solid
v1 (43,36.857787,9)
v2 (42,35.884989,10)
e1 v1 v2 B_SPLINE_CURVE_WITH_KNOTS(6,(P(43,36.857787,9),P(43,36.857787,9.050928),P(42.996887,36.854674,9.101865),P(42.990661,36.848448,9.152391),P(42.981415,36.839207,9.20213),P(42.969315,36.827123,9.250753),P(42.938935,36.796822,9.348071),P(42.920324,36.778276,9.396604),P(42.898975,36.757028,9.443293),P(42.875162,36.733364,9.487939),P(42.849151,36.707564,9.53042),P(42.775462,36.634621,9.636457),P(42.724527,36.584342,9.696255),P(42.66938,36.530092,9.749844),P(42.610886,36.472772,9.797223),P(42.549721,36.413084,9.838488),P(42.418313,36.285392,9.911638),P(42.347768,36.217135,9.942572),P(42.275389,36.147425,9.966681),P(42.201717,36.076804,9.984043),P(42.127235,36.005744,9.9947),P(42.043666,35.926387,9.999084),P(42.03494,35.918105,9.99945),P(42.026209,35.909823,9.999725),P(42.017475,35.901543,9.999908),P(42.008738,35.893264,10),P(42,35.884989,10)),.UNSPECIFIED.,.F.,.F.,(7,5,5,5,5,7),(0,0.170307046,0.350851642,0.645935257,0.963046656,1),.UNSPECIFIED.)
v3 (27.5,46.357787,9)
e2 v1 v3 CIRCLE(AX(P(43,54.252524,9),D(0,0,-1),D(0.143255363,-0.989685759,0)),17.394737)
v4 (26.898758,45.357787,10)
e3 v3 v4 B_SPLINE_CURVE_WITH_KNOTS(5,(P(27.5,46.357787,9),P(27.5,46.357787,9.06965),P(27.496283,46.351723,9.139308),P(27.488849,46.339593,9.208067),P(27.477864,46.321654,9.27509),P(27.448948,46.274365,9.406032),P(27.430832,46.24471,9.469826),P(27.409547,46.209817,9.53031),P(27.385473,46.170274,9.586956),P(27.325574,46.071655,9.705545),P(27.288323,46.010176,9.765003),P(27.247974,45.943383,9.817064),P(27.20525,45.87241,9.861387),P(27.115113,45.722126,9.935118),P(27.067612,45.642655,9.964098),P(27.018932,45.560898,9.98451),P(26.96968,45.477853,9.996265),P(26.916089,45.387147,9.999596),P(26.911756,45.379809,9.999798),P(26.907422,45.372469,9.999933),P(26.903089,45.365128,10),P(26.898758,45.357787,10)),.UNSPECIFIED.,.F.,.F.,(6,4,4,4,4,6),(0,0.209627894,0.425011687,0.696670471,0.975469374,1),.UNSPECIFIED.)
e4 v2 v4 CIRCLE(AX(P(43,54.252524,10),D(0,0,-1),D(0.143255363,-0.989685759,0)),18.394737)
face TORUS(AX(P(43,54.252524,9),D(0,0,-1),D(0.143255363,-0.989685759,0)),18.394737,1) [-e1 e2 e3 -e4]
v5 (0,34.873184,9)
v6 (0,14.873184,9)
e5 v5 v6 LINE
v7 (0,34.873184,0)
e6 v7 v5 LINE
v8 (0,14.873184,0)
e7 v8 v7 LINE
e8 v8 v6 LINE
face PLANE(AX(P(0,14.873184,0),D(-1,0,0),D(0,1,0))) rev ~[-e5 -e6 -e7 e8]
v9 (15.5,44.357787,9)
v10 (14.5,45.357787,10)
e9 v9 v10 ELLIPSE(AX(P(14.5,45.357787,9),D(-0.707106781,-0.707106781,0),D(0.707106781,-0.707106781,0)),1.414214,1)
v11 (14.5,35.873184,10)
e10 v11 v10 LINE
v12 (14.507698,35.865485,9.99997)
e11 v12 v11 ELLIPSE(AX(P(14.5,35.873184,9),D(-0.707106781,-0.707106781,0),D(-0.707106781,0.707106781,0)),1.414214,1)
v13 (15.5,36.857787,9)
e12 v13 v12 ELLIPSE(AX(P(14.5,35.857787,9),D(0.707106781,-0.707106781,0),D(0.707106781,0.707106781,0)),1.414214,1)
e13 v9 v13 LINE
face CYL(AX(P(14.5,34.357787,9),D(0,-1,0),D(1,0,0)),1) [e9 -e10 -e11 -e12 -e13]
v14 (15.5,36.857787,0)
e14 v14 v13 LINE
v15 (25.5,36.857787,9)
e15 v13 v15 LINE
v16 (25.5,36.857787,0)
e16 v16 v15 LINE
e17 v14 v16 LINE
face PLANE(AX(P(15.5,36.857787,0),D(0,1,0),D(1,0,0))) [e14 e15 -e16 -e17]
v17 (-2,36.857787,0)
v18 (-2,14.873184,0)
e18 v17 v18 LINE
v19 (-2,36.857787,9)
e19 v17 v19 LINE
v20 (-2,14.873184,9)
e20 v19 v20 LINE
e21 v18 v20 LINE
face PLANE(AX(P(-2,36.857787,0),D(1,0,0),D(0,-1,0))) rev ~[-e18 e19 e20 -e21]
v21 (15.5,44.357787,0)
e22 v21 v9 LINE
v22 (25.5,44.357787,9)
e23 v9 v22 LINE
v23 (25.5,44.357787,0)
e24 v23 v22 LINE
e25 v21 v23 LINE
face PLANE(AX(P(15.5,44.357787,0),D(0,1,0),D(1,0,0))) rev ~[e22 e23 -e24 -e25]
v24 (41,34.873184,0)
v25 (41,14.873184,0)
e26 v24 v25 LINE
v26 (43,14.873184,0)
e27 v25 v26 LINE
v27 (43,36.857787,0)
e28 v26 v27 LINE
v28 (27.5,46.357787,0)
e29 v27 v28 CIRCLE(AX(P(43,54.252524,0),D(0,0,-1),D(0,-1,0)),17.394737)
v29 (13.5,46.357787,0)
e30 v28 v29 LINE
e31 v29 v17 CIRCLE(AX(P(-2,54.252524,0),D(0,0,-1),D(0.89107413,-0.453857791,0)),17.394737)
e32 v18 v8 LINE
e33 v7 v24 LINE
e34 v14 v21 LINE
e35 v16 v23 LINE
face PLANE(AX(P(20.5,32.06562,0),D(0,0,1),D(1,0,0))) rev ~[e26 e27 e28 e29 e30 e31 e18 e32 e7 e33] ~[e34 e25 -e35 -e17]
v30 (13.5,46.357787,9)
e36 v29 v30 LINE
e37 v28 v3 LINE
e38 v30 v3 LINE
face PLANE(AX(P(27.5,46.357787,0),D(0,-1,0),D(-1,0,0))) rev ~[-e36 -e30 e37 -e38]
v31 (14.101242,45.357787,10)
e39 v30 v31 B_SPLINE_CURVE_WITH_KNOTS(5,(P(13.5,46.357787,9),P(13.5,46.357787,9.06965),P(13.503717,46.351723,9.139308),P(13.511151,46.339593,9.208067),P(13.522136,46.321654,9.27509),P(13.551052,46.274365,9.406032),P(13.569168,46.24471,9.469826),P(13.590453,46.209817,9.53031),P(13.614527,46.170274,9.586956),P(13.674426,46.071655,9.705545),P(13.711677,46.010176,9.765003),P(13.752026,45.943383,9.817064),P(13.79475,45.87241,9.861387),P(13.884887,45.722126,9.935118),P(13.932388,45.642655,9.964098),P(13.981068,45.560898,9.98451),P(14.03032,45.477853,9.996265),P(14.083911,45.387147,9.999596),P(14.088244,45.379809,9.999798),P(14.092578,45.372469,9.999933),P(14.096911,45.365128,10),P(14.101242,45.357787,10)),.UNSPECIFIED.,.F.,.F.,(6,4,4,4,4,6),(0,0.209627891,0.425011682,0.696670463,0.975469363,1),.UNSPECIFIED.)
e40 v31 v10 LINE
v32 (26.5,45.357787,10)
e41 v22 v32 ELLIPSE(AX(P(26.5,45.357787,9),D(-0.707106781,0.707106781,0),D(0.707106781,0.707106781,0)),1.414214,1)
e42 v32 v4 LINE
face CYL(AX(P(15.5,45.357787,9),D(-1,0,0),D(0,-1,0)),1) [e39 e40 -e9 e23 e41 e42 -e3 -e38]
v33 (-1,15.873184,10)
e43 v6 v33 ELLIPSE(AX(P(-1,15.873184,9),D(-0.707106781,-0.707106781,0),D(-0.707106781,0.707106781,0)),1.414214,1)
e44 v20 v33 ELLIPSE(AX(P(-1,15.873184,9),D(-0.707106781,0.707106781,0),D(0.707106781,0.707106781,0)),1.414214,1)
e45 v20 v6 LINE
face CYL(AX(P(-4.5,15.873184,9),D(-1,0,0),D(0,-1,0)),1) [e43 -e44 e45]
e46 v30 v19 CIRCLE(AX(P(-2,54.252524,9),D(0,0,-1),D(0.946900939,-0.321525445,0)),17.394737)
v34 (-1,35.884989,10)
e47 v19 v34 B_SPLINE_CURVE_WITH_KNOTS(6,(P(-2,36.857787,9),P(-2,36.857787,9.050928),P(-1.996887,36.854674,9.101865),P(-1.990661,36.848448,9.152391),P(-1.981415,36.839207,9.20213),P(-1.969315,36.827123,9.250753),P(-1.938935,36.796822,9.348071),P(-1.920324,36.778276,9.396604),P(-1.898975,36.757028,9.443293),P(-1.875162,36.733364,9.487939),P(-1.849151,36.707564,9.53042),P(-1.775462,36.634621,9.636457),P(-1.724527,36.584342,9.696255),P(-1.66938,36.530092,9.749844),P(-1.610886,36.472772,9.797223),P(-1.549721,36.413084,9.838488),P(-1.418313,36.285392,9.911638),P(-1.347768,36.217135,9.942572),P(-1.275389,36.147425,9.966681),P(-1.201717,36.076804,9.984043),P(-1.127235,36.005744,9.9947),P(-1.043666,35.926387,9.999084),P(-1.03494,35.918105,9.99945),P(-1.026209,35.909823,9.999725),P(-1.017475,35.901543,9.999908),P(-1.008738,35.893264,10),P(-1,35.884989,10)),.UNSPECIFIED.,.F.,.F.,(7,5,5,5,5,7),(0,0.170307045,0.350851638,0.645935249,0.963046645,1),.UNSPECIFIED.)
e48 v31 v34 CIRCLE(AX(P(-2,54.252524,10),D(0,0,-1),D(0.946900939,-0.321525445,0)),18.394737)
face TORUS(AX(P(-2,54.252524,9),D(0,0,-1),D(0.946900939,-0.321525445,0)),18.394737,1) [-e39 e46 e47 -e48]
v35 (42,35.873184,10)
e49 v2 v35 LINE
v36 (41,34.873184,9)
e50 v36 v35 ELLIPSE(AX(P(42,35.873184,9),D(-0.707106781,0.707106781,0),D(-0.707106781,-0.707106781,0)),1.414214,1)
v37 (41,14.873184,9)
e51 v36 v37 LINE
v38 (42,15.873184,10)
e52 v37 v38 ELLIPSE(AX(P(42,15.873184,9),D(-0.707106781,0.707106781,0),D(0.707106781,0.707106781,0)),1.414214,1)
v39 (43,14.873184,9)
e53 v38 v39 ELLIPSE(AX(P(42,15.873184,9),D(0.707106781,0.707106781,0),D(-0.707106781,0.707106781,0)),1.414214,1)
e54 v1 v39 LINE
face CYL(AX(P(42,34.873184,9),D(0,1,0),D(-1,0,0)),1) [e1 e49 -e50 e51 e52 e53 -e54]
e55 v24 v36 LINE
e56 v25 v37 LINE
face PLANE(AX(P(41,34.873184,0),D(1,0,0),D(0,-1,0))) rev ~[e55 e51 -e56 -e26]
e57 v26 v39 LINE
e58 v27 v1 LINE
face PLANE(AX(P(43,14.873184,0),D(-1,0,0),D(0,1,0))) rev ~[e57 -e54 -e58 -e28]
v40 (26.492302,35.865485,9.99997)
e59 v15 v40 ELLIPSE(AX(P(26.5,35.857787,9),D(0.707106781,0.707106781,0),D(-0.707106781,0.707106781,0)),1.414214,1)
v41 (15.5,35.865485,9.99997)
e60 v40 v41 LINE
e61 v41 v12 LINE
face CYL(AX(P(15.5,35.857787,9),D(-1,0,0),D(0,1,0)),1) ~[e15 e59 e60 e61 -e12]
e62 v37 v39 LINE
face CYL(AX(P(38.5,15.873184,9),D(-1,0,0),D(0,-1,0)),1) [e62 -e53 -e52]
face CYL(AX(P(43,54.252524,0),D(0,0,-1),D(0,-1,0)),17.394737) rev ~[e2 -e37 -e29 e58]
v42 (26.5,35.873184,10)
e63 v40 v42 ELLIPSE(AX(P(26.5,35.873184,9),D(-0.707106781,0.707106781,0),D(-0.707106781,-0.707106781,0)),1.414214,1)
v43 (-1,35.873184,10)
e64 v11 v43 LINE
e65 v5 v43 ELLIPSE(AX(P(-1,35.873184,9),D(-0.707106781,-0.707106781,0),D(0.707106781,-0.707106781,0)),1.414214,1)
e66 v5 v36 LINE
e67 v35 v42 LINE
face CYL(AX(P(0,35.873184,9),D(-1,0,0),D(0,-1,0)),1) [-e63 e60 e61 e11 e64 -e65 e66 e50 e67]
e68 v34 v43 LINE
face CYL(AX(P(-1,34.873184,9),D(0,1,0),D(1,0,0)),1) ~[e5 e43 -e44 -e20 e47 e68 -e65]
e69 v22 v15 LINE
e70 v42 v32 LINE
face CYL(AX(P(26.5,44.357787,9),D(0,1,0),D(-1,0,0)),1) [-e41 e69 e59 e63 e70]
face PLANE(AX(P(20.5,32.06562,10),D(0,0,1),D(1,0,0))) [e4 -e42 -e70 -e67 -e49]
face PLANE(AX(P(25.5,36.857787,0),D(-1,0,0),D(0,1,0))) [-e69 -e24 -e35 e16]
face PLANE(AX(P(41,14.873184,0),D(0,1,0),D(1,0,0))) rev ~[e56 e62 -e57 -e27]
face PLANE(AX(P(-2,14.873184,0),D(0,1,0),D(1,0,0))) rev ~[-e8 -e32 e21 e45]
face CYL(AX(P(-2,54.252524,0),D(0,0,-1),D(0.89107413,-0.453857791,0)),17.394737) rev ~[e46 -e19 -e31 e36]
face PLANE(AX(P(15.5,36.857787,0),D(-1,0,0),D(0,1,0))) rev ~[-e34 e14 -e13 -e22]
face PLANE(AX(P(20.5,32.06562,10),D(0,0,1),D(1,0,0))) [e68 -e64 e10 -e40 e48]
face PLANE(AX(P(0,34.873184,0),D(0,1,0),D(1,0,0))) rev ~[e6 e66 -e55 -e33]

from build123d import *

# Parameters (mm, degrees)
F0_W         = 10
F0_H         = 7.5
F1_DEPTH     = 10
F2_T1_DEPTH  = 26.9846032165
F2_T3_DEPTH  = 7
F2_T5_DEPTH  = 22.5
F2_T7_DEPTH  = 41
F2_T9_DEPTH  = 7
F2_T11_DEPTH = 19
F2_T13_DEPTH = 7.5
F2_T15_DEPTH = 10
F2_T18_ANGLE = 79.4810617097
F2_T20_ANGLE = 79.4810617097
F2_T25_DEPTH = 25
F2_T29_DEPTH = 43.5
F2_T36_DEPTH = 43.5
F2_T40_DEPTH = 25
F2_T47_DEPTH = 10
F2_T51_DEPTH = 12.5
F2_T58_DEPTH = 10
F2_T62_DEPTH = 12.5
F2_T69_DEPTH = 12.5
F2_T73_DEPTH = 10
F2_T80_DEPTH = 10
F2_T84_DEPTH = 12.5


# Not quite as in the source:
# - a fillet or chamfer that OpenCascade refuses, or shapes differently, is made with other operations: its cross-section is extruded or revolved along the edge and cut away or added


with BuildPart() as f1:
    # F0 (on Top) → F1 (new body)
    with BuildSketch(Plane.XY):
        with BuildLine():
            Line((0, 34.8731837149), (41, 34.8731837149))
            Line((41, 34.8731837149), (41, 14.8731837149))
            Line((41, 14.8731837149), (43, 14.8731837149))
            Line((43, 14.8731837149), (43, 36.8577869315))
            ThreePointArc((43, 36.8577869315), (33.9101705187, 39.4217493566), (27.5, 46.3577869315))
            Line((27.5, 46.3577869315), (13.5, 46.3577869315))
            ThreePointArc((13.5, 46.3577869315), (7.0898294813, 39.4217493566), (-2, 36.8577869315))
            Line((-2, 36.8577869315), (-2, 14.8731837149))
            Line((-2, 14.8731837149), (0, 14.8731837149))
            Line((0, 14.8731837149), (0, 34.8731837149))
        make_face()
        with Locations((20.5, 40.6077869315)):
            Rectangle(F0_W, F0_H, mode=Mode.SUBTRACT)
    extrude(amount=F1_DEPTH)

    # F2: fillet of radius 1 on 14 edges, made by hand

    # F2_s2 → F2_t1 (cut)
    with BuildSketch(Plane.XZ.offset(-39.3577869315)):
        with BuildLine():
            ThreePointArc((-2, 9), (-1.7071067812, 9.7071067812), (-1, 10))
            Line((-1, 10), (-2, 10))
            Line((-2, 10), (-2, 9))
        make_face()
        with BuildLine():
            ThreePointArc((43, 9), (42.7071067812, 9.7071067812), (42, 10))
            Line((42, 10), (43, 10))
            Line((43, 10), (43, 9))
        make_face()
    extrude(amount=F2_T1_DEPTH, mode=Mode.SUBTRACT)

    # F2_s4 → F2_t3 (cut)
    with BuildSketch(Plane.YZ.offset(-4.5)):
        with BuildLine():
            ThreePointArc((14.8731837149, 9), (15.1660769337, 9.7071067812), (15.8731837149, 10))
            Line((15.8731837149, 10), (14.8731837149, 10))
            Line((14.8731837149, 10), (14.8731837149, 9))
        make_face()
    extrude(amount=F2_T3_DEPTH, mode=Mode.SUBTRACT)

    # F2_s6 → F2_t5 (cut)
    with BuildSketch(Plane.XZ.offset(-34.8731837149)):
        with BuildLine():
            ThreePointArc((0, 9), (-0.2928932188, 9.7071067812), (-1, 10))
            Line((-1, 10), (0, 10))
            Line((0, 10), (0, 9))
        make_face()
        with BuildLine():
            ThreePointArc((41, 9), (41.2928932188, 9.7071067812), (42, 10))
            Line((42, 10), (41, 10))
            Line((41, 10), (41, 9))
        make_face()
    extrude(amount=F2_T5_DEPTH, mode=Mode.SUBTRACT)

    # F2_s8 → F2_t7 (cut)
    with BuildSketch(Plane.YZ):
        with BuildLine():
            ThreePointArc((34.8731837149, 9), (35.1660769337, 9.7071067812), (35.8731837149, 10))
            Line((35.8731837149, 10), (34.8731837149, 10))
            Line((34.8731837149, 10), (34.8731837149, 9))
        make_face()
    extrude(amount=F2_T7_DEPTH, mode=Mode.SUBTRACT)

    # F2_s10 → F2_t9 (cut)
    with BuildSketch(Plane.YZ.offset(38.5)):
        with BuildLine():
            ThreePointArc((14.8731837149, 9), (15.1660769337, 9.7071067812), (15.8731837149, 10))
            Line((15.8731837149, 10), (14.8731837149, 10))
            Line((14.8731837149, 10), (14.8731837149, 9))
        make_face()
    extrude(amount=F2_T9_DEPTH, mode=Mode.SUBTRACT)

    # F2_s12 → F2_t11 (cut)
    with BuildSketch(Plane.YZ.offset(11)):
        with BuildLine():
            ThreePointArc((46.3577869315, 9), (46.0648937127, 9.7071067812), (45.3577869315, 10))
            Line((45.3577869315, 10), (46.3577869315, 10))
            Line((46.3577869315, 10), (46.3577869315, 9))
        make_face()
    extrude(amount=F2_T11_DEPTH, mode=Mode.SUBTRACT)

    # F2_s14 → F2_t13 (cut)
    with BuildSketch(Plane.XZ.offset(-44.3577869315)):
        with BuildLine():
            ThreePointArc((25.5, 9), (25.7928932188, 9.7071067812), (26.5, 10))
            Line((26.5, 10), (25.5, 10))
            Line((25.5, 10), (25.5, 9))
        make_face()
        with BuildLine():
            ThreePointArc((15.5, 9), (15.2071067812, 9.7071067812), (14.5, 10))
            Line((14.5, 10), (15.5, 10))
            Line((15.5, 10), (15.5, 9))
        make_face()
    extrude(amount=F2_T13_DEPTH, mode=Mode.SUBTRACT)

    # F2_s16 → F2_t15 (cut)
    with BuildSketch(Plane.YZ.offset(15.5)):
        with BuildLine():
            ThreePointArc((36.8577869315, 9), (36.5648937127, 9.7071067812), (35.8577869315, 10))
            Line((35.8577869315, 10), (36.8577869315, 10))
            Line((36.8577869315, 10), (36.8577869315, 9))
        make_face()
        with BuildLine():
            ThreePointArc((44.3577869315, 9), (44.6506801503, 9.7071067812), (45.3577869315, 10))
            Line((45.3577869315, 10), (44.3577869315, 10))
            Line((44.3577869315, 10), (44.3577869315, 9))
        make_face()
    extrude(amount=F2_T15_DEPTH, mode=Mode.SUBTRACT)

    # F2_s17 → F2_t18 (revolve, cut)
    with BuildSketch(Plane(origin=(16.3105725922, 48.0350676987, 0), x_dir=(0, 0, 1), z_dir=(0.3215254447, 0.9469009391, 0))):
        with BuildLine():
            ThreePointArc((9, -1.9426318697), (9.7071067812, -1.6497386509), (10, -0.9426318697))
            Line((10, -0.9426318697), (10, -1.9426318697))
            Line((10, -1.9426318697), (9, -1.9426318697))
        make_face()
    revolve(axis=Axis((-2, 54.2525237736, 10), (0, 0, -1)), revolution_arc=F2_T18_ANGLE, mode=Mode.SUBTRACT)

    # F2_s19 → F2_t20 (revolve, cut)
    with BuildSketch(Plane(origin=(49.8093527962, 7.2098207335, 0), x_dir=(0, 0, 1), z_dir=(0.9896857587, 0.1432553627, 0))):
        with BuildLine():
            ThreePointArc((9, -30.138232714), (9.7071067812, -29.8453394951), (10, -29.138232714))
            Line((10, -29.138232714), (10, -30.138232714))
            Line((10, -30.138232714), (9, -30.138232714))
        make_face()
    revolve(axis=Axis((43, 54.2525237736, 10), (0, 0, -1)), revolution_arc=F2_T20_ANGLE, mode=Mode.SUBTRACT)


with BuildPart() as f2_tool23:
    # F2_s24 → F2_t25 (new body)
    with BuildSketch(Plane.XZ.offset(-12.3731837149)):
        with BuildLine():
            ThreePointArc((0, 9), (-0.2928932188, 9.7071067812), (-1, 10))
            Line((-1, 10), (0, 10))
            Line((0, 10), (0, 9))
        make_face()
    extrude(amount=-F2_T25_DEPTH)

    split(bisect_by=Plane.XZ.offset(-34.8731837149), keep=Keep.BOTTOM)


with BuildPart() as f2_tool27:
    # F2_s28 → F2_t29 (new body)
    with BuildSketch(Plane.YZ.offset(-2.5)):
        with BuildLine():
            ThreePointArc((34.8731837149, 9), (35.1660769337, 9.7071067812), (35.8731837149, 10))
            Line((35.8731837149, 10), (34.8731837149, 10))
            Line((34.8731837149, 10), (34.8731837149, 9))
        make_face()
    extrude(amount=F2_T29_DEPTH)

    split(bisect_by=Plane.YZ, keep=Keep.BOTTOM)


with BuildPart() as f2_tool23_1:
    add(f2_tool23.part)

    # F2_t31: intersect F2_tool27
    add(f2_tool27.part, mode=Mode.INTERSECT)


with BuildPart() as f1_1:
    add(f1.part)

    # F2_t21: cut F2_tool23
    add(f2_tool23_1.part, mode=Mode.SUBTRACT)


with BuildPart() as f2_tool34:
    # F2_s35 → F2_t36 (new body)
    with BuildSketch(Plane.YZ):
        with BuildLine():
            ThreePointArc((34.8731837149, 9), (35.1660769337, 9.7071067812), (35.8731837149, 10))
            Line((35.8731837149, 10), (34.8731837149, 10))
            Line((34.8731837149, 10), (34.8731837149, 9))
        make_face()
    extrude(amount=F2_T36_DEPTH)

    split(bisect_by=Plane.YZ.offset(41), keep=Keep.TOP)


with BuildPart() as f2_tool38:
    # F2_s39 → F2_t40 (new body)
    with BuildSketch(Plane.XZ.offset(-37.3731837149)):
        with BuildLine():
            ThreePointArc((41, 9), (41.2928932188, 9.7071067812), (42, 10))
            Line((42, 10), (41, 10))
            Line((41, 10), (41, 9))
        make_face()
    extrude(amount=F2_T40_DEPTH)

    split(bisect_by=Plane.XZ.offset(-34.8731837149), keep=Keep.BOTTOM)


with BuildPart() as f2_tool34_1:
    add(f2_tool34.part)

    # F2_t42: intersect F2_tool38
    add(f2_tool38.part, mode=Mode.INTERSECT)


with BuildPart() as f1_2:
    add(f1_1.part)

    # F2_t32: cut F2_tool34
    add(f2_tool34_1.part, mode=Mode.SUBTRACT)


with BuildPart() as f2_tool45:
    # F2_s46 → F2_t47 (new body)
    with BuildSketch(Plane.XZ.offset(-46.8577869315)):
        with BuildLine():
            ThreePointArc((25.5, 9), (25.7928932188, 9.7071067812), (26.5, 10))
            Line((26.5, 10), (25.5, 10))
            Line((25.5, 10), (25.5, 9))
        make_face()
    extrude(amount=F2_T47_DEPTH)

    split(bisect_by=Plane.XZ.offset(-44.3577869315), keep=Keep.BOTTOM)


with BuildPart() as f2_tool49:
    # F2_s50 → F2_t51 (new body)
    with BuildSketch(Plane.YZ.offset(15.5)):
        with BuildLine():
            ThreePointArc((44.3577869315, 9), (44.6506801503, 9.7071067812), (45.3577869315, 10))
            Line((45.3577869315, 10), (44.3577869315, 10))
            Line((44.3577869315, 10), (44.3577869315, 9))
        make_face()
    extrude(amount=F2_T51_DEPTH)

    split(bisect_by=Plane.YZ.offset(25.5), keep=Keep.TOP)


with BuildPart() as f2_tool45_1:
    add(f2_tool45.part)

    # F2_t53: intersect F2_tool49
    add(f2_tool49.part, mode=Mode.INTERSECT)


with BuildPart() as f1_3:
    add(f1_2.part)

    # F2_t43: cut F2_tool45
    add(f2_tool45_1.part, mode=Mode.SUBTRACT)


with BuildPart() as f2_tool56:
    # F2_s57 → F2_t58 (new body)
    with BuildSketch(Plane.XZ.offset(-44.3577869315)):
        with BuildLine():
            ThreePointArc((25.5, 9), (25.7928932188, 9.7071067812), (26.5, 10))
            Line((26.5, 10), (25.5, 10))
            Line((25.5, 10), (25.5, 9))
        make_face()
    extrude(amount=F2_T58_DEPTH)

    split(bisect_by=Plane.XZ.offset(-36.8577869315), keep=Keep.TOP)


with BuildPart() as f2_tool60:
    # F2_s61 → F2_t62 (new body)
    with BuildSketch(Plane.YZ.offset(28)):
        with BuildLine():
            ThreePointArc((36.8577869315, 9), (36.5648937127, 9.7071067812), (35.8577869315, 10))
            Line((35.8577869315, 10), (36.8577869315, 10))
            Line((36.8577869315, 10), (36.8577869315, 9))
        make_face()
    extrude(amount=-F2_T62_DEPTH)

    split(bisect_by=Plane.YZ.offset(25.5), keep=Keep.TOP)


with BuildPart() as f2_tool56_1:
    add(f2_tool56.part)

    # F2_t64: intersect F2_tool60
    add(f2_tool60.part, mode=Mode.INTERSECT)


with BuildPart() as f1_4:
    add(f1_3.part)

    # F2_t54: cut F2_tool56
    add(f2_tool56_1.part, mode=Mode.SUBTRACT)


with BuildPart() as f2_tool67:
    # F2_s68 → F2_t69 (new body)
    with BuildSketch(Plane.YZ.offset(25.5)):
        with BuildLine():
            ThreePointArc((36.8577869315, 9), (36.5648937127, 9.7071067812), (35.8577869315, 10))
            Line((35.8577869315, 10), (36.8577869315, 10))
            Line((36.8577869315, 10), (36.8577869315, 9))
        make_face()
    extrude(amount=-F2_T69_DEPTH)

    split(bisect_by=Plane.YZ.offset(15.5), keep=Keep.BOTTOM)


with BuildPart() as f2_tool71:
    # F2_s72 → F2_t73 (new body)
    with BuildSketch(Plane.XZ.offset(-34.3577869315)):
        with BuildLine():
            ThreePointArc((15.5, 9), (15.2071067812, 9.7071067812), (14.5, 10))
            Line((14.5, 10), (15.5, 10))
            Line((15.5, 10), (15.5, 9))
        make_face()
    extrude(amount=-F2_T73_DEPTH)

    split(bisect_by=Plane.XZ.offset(-36.8577869315), keep=Keep.TOP)


with BuildPart() as f2_tool67_1:
    add(f2_tool67.part)

    # F2_t75: intersect F2_tool71
    add(f2_tool71.part, mode=Mode.INTERSECT)


with BuildPart() as f1_5:
    add(f1_4.part)

    # F2_t65: cut F2_tool67
    add(f2_tool67_1.part, mode=Mode.SUBTRACT)


with BuildPart() as f2_tool78:
    # F2_s79 → F2_t80 (new body)
    with BuildSketch(Plane.XZ.offset(-36.8577869315)):
        with BuildLine():
            ThreePointArc((15.5, 9), (15.2071067812, 9.7071067812), (14.5, 10))
            Line((14.5, 10), (15.5, 10))
            Line((15.5, 10), (15.5, 9))
        make_face()
    extrude(amount=-F2_T80_DEPTH)

    split(bisect_by=Plane.XZ.offset(-44.3577869315), keep=Keep.BOTTOM)


with BuildPart() as f2_tool82:
    # F2_s83 → F2_t84 (new body)
    with BuildSketch(Plane.YZ.offset(13)):
        with BuildLine():
            ThreePointArc((44.3577869315, 9), (44.6506801503, 9.7071067812), (45.3577869315, 10))
            Line((45.3577869315, 10), (44.3577869315, 10))
            Line((44.3577869315, 10), (44.3577869315, 9))
        make_face()
    extrude(amount=F2_T84_DEPTH)

    split(bisect_by=Plane.YZ.offset(15.5), keep=Keep.BOTTOM)


with BuildPart() as f2_tool78_1:
    add(f2_tool78.part)

    # F2_t86: intersect F2_tool82
    add(f2_tool82.part, mode=Mode.INTERSECT)


with BuildPart() as f1_6:
    add(f1_5.part)

    # F2_t76: cut F2_tool78
    add(f2_tool78_1.part, mode=Mode.SUBTRACT)


solid = f1_6.part
